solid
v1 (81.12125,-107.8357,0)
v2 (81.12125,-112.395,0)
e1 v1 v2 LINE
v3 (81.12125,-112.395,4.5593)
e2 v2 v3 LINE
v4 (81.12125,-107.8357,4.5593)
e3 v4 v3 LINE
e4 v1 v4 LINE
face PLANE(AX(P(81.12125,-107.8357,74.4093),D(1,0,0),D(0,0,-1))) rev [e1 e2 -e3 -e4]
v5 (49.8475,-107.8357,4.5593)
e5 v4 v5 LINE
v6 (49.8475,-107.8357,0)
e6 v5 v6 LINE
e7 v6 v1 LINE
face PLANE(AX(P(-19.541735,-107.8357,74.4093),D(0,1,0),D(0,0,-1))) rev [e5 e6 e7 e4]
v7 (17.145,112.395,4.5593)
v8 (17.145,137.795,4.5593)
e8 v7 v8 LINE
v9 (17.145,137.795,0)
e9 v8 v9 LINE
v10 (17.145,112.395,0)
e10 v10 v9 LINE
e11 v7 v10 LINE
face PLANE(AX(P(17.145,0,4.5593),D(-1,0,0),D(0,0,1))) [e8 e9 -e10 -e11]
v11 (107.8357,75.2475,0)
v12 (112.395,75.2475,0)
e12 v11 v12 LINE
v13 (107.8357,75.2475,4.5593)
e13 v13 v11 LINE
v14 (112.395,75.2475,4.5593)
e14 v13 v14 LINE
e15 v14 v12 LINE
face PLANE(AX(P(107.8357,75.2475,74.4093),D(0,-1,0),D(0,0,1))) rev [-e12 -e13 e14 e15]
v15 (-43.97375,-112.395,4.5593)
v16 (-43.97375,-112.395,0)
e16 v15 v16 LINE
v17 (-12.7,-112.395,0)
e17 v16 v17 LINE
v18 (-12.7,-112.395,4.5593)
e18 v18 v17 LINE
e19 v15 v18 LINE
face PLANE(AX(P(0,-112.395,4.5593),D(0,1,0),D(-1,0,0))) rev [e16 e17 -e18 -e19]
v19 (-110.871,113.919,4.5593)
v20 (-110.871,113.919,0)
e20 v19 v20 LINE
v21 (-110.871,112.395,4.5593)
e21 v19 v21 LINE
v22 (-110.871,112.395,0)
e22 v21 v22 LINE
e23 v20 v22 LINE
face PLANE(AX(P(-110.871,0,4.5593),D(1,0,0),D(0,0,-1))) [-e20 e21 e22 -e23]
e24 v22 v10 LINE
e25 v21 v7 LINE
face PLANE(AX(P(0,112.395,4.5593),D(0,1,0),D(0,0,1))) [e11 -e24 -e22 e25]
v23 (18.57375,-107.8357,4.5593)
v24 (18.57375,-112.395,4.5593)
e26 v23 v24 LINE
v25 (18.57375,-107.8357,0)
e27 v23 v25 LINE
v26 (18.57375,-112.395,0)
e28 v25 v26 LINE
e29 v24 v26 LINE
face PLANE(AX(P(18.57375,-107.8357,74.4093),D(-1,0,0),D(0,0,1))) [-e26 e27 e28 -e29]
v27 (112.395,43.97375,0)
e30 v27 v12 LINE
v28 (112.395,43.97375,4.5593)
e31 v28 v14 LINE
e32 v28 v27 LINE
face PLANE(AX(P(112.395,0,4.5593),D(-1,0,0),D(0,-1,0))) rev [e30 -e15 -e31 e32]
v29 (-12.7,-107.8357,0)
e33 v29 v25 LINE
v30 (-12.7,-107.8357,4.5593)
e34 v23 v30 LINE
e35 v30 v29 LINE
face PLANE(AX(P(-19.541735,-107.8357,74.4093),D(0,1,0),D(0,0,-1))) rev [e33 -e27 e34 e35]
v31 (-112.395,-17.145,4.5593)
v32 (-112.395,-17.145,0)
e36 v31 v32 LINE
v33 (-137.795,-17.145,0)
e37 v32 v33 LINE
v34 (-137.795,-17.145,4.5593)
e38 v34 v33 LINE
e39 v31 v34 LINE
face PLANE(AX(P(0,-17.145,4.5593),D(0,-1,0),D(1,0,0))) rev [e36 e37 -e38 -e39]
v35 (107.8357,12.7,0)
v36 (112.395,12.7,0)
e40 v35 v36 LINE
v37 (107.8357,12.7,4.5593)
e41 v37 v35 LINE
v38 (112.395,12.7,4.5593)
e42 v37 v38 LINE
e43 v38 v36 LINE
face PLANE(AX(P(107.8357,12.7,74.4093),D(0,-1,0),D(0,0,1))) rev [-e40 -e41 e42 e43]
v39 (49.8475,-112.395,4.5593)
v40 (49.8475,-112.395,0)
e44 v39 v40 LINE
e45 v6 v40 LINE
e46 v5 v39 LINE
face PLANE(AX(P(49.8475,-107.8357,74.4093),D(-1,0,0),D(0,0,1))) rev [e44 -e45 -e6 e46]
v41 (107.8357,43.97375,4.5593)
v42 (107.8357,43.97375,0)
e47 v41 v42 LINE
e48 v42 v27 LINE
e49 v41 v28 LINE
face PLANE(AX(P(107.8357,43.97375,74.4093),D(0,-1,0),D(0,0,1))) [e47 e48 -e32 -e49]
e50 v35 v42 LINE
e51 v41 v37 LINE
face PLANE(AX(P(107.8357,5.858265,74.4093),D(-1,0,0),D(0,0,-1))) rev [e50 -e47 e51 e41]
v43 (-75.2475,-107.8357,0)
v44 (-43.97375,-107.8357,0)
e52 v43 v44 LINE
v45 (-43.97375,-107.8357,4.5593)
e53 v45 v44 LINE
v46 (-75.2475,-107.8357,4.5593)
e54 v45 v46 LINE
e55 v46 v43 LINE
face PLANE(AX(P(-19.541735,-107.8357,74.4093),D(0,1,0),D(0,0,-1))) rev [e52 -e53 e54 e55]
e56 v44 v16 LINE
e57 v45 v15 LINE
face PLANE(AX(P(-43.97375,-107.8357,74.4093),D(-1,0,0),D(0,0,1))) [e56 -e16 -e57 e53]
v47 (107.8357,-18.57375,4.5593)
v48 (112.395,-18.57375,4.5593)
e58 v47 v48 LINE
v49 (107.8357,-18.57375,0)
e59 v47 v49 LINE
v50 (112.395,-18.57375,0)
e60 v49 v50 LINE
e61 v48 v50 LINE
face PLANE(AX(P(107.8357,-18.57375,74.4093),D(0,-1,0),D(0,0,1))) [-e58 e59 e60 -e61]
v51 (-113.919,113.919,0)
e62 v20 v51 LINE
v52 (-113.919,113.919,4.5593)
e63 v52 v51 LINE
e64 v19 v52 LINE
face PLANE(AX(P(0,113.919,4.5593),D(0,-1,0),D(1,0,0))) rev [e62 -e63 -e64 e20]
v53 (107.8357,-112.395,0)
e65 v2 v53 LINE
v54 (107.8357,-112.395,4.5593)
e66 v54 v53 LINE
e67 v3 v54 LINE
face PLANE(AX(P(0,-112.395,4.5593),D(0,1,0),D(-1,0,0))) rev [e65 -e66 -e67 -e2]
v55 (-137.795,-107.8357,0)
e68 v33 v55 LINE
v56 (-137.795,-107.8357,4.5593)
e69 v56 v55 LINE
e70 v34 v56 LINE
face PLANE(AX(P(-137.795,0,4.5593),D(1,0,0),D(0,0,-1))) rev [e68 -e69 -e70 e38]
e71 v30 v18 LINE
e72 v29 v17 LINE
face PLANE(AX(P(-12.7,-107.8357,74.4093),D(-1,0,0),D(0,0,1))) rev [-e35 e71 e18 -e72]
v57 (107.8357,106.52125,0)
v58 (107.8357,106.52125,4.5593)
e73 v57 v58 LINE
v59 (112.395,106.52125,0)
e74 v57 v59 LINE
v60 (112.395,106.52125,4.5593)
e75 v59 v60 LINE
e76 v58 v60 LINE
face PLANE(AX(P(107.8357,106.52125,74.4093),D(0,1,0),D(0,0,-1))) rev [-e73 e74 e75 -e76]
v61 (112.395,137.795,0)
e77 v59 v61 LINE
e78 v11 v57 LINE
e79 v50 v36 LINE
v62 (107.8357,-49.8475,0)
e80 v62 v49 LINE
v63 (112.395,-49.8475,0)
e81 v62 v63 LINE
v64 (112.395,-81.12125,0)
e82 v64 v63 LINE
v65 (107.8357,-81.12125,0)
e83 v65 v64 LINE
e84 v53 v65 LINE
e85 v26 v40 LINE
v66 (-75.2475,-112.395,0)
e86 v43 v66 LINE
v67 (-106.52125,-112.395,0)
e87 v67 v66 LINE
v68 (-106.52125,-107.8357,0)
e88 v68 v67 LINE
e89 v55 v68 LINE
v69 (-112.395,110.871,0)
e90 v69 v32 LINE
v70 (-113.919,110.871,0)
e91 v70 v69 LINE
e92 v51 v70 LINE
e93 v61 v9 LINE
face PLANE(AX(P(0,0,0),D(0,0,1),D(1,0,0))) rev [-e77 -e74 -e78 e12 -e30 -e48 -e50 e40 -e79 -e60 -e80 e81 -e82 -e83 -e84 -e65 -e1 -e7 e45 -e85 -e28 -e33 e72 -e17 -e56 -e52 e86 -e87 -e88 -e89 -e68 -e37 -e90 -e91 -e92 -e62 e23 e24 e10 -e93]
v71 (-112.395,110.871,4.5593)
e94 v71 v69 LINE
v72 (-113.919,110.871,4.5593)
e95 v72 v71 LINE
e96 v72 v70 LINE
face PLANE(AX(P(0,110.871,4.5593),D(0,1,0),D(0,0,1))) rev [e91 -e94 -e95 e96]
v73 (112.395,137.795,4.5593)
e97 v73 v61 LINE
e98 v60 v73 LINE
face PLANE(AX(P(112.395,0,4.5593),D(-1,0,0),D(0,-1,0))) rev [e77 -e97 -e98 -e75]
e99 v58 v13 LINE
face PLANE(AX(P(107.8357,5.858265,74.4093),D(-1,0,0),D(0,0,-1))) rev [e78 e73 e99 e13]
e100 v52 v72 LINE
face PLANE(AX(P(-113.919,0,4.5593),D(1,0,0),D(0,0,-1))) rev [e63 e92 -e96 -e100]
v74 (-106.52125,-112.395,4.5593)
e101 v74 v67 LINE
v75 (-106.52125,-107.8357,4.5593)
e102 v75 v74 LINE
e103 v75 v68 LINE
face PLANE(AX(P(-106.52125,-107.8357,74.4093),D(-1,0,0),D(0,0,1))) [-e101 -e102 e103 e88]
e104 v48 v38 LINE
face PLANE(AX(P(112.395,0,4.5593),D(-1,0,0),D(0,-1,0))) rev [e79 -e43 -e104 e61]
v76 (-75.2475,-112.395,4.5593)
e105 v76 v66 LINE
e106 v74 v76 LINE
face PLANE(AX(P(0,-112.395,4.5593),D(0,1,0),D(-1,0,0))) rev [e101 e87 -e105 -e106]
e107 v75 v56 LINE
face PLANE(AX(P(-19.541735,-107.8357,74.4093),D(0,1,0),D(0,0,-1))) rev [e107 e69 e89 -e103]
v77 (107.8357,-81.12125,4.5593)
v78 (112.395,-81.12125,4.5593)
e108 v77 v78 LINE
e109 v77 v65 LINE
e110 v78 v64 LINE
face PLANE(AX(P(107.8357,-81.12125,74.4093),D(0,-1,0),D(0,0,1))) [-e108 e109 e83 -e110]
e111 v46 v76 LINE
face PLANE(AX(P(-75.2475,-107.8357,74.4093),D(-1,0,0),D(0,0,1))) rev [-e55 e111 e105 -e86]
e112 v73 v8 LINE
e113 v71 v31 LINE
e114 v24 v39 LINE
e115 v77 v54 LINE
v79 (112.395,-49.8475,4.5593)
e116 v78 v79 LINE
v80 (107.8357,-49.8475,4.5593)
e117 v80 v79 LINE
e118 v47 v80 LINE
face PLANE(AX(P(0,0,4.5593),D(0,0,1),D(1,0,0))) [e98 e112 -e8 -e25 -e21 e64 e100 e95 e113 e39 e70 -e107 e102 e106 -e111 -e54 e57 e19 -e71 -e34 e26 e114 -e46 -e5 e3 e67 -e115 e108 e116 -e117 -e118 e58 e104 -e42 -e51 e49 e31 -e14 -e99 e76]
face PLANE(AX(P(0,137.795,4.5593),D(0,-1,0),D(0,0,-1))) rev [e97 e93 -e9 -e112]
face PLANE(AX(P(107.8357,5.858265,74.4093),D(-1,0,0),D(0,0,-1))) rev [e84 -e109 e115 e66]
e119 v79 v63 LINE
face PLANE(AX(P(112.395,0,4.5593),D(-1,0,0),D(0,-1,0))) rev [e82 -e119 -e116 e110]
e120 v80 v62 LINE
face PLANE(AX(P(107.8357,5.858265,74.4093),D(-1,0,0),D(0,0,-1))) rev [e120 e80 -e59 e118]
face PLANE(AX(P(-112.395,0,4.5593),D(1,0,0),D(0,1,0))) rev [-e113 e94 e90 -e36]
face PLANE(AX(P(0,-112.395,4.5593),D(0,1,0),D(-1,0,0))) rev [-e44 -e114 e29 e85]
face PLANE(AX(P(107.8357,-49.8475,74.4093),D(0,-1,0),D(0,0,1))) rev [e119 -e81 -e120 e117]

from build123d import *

# Parameters (mm, degrees)
BOSS_EXTRUDE1_DEPTH = 4.5593
CAVITY1_START       = -112.395
CAVITY1_OUTLINE_W   = 4.5593
CAVITY1_OUTLINE_H   = 4.5593
CAVITY1_OUTLINE_W_2 = 31.27375
CAVITY1_DEPTH       = 4.5593
CAVITY1_START_2     = -49.8475
CAVITY1_2_OUTLINE_W = 4.5593
CAVITY1_2_OUTLINE_H = 4.5593
CAVITY1_2_DEPTH     = 31.27375
CAVITY1_START_3     = 12.7
CAVITY1_3_OUTLINE_W = 4.5593
CAVITY1_3_OUTLINE_H = 4.5593
CAVITY1_3_DEPTH     = 31.27375
CAVITY1_START_4     = 75.2475
CAVITY1_4_OUTLINE_W = 4.5593
CAVITY1_4_OUTLINE_H = 4.5593
CAVITY1_4_DEPTH     = 31.27375
CAVITY1_START_5     = -107.8357
CAVITY1_5_OUTLINE_W = 4.5593
CAVITY1_5_OUTLINE_H = 4.5593
CAVITY1_5_DEPTH     = 26.71445


# Read off the part's stored shape, not the designer's step: Cavity1
with BuildPart() as part:
    # Sketch1 → Boss-Extrude1 (new body)
    with BuildSketch(Plane.XY):
        Polygon((-112.395, -17.145), (-137.795, -17.145), (-137.795, -112.395), (112.395, -112.395), (112.395, 112.395), (112.395, 137.795), (17.145, 137.795), (17.145, 112.395), (-110.871, 112.395), (-110.871, 113.919), (-113.919, 113.919), (-113.919, 110.871), (-112.395, 110.871), align=None)
    extrude(amount=BOSS_EXTRUDE1_DEPTH)

    # Cavity1 outline → Cavity1 (cut)
    with BuildSketch(Plane(origin=(0, 0, 0), x_dir=(1, 0, 0), z_dir=(0, 1, 0)).offset(CAVITY1_START)):
        with Locations((110.11535, -2.27965)):
            Rectangle(CAVITY1_OUTLINE_W, CAVITY1_OUTLINE_H)
        with Locations((65.484375, -2.27965)):
            Rectangle(CAVITY1_OUTLINE_W_2, CAVITY1_OUTLINE_H)
        with Locations((2.936875, -2.27965)):
            Rectangle(CAVITY1_OUTLINE_W_2, CAVITY1_OUTLINE_H)
        with Locations((-59.610625, -2.27965)):
            Rectangle(CAVITY1_OUTLINE_W_2, CAVITY1_OUTLINE_H)
        with Locations((-122.158125, -2.27965)):
            Rectangle(CAVITY1_OUTLINE_W_2, CAVITY1_OUTLINE_H)
    extrude(amount=CAVITY1_DEPTH, mode=Mode.SUBTRACT)

    # Cavity1 2 outline → Cavity1 2 (cut)
    with BuildSketch(Plane(origin=(0, 0, 0), x_dir=(1, 0, 0), z_dir=(0, 1, 0)).offset(CAVITY1_START_2)):
        with Locations((110.11535, -2.27965)):
            Rectangle(CAVITY1_2_OUTLINE_W, CAVITY1_2_OUTLINE_H)
    extrude(amount=CAVITY1_2_DEPTH, mode=Mode.SUBTRACT)

    # Cavity1 3 outline → Cavity1 3 (cut)
    with BuildSketch(Plane(origin=(0, 0, 0), x_dir=(1, 0, 0), z_dir=(0, 1, 0)).offset(CAVITY1_START_3)):
        with Locations((110.11535, -2.27965)):
            Rectangle(CAVITY1_3_OUTLINE_W, CAVITY1_3_OUTLINE_H)
    extrude(amount=CAVITY1_3_DEPTH, mode=Mode.SUBTRACT)

    # Cavity1 4 outline → Cavity1 4 (cut)
    with BuildSketch(Plane(origin=(0, 0, 0), x_dir=(1, 0, 0), z_dir=(0, 1, 0)).offset(CAVITY1_START_4)):
        with Locations((110.11535, -2.27965)):
            Rectangle(CAVITY1_4_OUTLINE_W, CAVITY1_4_OUTLINE_H)
    extrude(amount=CAVITY1_4_DEPTH, mode=Mode.SUBTRACT)

    # Cavity1 5 outline → Cavity1 5 (cut)
    with BuildSketch(Plane(origin=(0, 0, 0), x_dir=(1, 0, 0), z_dir=(0, 1, 0)).offset(CAVITY1_START_5)):
        with Locations((110.11535, -2.27965)):
            Rectangle(CAVITY1_5_OUTLINE_W, CAVITY1_5_OUTLINE_H)
    extrude(amount=CAVITY1_5_DEPTH, mode=Mode.SUBTRACT)


solid = part.part
